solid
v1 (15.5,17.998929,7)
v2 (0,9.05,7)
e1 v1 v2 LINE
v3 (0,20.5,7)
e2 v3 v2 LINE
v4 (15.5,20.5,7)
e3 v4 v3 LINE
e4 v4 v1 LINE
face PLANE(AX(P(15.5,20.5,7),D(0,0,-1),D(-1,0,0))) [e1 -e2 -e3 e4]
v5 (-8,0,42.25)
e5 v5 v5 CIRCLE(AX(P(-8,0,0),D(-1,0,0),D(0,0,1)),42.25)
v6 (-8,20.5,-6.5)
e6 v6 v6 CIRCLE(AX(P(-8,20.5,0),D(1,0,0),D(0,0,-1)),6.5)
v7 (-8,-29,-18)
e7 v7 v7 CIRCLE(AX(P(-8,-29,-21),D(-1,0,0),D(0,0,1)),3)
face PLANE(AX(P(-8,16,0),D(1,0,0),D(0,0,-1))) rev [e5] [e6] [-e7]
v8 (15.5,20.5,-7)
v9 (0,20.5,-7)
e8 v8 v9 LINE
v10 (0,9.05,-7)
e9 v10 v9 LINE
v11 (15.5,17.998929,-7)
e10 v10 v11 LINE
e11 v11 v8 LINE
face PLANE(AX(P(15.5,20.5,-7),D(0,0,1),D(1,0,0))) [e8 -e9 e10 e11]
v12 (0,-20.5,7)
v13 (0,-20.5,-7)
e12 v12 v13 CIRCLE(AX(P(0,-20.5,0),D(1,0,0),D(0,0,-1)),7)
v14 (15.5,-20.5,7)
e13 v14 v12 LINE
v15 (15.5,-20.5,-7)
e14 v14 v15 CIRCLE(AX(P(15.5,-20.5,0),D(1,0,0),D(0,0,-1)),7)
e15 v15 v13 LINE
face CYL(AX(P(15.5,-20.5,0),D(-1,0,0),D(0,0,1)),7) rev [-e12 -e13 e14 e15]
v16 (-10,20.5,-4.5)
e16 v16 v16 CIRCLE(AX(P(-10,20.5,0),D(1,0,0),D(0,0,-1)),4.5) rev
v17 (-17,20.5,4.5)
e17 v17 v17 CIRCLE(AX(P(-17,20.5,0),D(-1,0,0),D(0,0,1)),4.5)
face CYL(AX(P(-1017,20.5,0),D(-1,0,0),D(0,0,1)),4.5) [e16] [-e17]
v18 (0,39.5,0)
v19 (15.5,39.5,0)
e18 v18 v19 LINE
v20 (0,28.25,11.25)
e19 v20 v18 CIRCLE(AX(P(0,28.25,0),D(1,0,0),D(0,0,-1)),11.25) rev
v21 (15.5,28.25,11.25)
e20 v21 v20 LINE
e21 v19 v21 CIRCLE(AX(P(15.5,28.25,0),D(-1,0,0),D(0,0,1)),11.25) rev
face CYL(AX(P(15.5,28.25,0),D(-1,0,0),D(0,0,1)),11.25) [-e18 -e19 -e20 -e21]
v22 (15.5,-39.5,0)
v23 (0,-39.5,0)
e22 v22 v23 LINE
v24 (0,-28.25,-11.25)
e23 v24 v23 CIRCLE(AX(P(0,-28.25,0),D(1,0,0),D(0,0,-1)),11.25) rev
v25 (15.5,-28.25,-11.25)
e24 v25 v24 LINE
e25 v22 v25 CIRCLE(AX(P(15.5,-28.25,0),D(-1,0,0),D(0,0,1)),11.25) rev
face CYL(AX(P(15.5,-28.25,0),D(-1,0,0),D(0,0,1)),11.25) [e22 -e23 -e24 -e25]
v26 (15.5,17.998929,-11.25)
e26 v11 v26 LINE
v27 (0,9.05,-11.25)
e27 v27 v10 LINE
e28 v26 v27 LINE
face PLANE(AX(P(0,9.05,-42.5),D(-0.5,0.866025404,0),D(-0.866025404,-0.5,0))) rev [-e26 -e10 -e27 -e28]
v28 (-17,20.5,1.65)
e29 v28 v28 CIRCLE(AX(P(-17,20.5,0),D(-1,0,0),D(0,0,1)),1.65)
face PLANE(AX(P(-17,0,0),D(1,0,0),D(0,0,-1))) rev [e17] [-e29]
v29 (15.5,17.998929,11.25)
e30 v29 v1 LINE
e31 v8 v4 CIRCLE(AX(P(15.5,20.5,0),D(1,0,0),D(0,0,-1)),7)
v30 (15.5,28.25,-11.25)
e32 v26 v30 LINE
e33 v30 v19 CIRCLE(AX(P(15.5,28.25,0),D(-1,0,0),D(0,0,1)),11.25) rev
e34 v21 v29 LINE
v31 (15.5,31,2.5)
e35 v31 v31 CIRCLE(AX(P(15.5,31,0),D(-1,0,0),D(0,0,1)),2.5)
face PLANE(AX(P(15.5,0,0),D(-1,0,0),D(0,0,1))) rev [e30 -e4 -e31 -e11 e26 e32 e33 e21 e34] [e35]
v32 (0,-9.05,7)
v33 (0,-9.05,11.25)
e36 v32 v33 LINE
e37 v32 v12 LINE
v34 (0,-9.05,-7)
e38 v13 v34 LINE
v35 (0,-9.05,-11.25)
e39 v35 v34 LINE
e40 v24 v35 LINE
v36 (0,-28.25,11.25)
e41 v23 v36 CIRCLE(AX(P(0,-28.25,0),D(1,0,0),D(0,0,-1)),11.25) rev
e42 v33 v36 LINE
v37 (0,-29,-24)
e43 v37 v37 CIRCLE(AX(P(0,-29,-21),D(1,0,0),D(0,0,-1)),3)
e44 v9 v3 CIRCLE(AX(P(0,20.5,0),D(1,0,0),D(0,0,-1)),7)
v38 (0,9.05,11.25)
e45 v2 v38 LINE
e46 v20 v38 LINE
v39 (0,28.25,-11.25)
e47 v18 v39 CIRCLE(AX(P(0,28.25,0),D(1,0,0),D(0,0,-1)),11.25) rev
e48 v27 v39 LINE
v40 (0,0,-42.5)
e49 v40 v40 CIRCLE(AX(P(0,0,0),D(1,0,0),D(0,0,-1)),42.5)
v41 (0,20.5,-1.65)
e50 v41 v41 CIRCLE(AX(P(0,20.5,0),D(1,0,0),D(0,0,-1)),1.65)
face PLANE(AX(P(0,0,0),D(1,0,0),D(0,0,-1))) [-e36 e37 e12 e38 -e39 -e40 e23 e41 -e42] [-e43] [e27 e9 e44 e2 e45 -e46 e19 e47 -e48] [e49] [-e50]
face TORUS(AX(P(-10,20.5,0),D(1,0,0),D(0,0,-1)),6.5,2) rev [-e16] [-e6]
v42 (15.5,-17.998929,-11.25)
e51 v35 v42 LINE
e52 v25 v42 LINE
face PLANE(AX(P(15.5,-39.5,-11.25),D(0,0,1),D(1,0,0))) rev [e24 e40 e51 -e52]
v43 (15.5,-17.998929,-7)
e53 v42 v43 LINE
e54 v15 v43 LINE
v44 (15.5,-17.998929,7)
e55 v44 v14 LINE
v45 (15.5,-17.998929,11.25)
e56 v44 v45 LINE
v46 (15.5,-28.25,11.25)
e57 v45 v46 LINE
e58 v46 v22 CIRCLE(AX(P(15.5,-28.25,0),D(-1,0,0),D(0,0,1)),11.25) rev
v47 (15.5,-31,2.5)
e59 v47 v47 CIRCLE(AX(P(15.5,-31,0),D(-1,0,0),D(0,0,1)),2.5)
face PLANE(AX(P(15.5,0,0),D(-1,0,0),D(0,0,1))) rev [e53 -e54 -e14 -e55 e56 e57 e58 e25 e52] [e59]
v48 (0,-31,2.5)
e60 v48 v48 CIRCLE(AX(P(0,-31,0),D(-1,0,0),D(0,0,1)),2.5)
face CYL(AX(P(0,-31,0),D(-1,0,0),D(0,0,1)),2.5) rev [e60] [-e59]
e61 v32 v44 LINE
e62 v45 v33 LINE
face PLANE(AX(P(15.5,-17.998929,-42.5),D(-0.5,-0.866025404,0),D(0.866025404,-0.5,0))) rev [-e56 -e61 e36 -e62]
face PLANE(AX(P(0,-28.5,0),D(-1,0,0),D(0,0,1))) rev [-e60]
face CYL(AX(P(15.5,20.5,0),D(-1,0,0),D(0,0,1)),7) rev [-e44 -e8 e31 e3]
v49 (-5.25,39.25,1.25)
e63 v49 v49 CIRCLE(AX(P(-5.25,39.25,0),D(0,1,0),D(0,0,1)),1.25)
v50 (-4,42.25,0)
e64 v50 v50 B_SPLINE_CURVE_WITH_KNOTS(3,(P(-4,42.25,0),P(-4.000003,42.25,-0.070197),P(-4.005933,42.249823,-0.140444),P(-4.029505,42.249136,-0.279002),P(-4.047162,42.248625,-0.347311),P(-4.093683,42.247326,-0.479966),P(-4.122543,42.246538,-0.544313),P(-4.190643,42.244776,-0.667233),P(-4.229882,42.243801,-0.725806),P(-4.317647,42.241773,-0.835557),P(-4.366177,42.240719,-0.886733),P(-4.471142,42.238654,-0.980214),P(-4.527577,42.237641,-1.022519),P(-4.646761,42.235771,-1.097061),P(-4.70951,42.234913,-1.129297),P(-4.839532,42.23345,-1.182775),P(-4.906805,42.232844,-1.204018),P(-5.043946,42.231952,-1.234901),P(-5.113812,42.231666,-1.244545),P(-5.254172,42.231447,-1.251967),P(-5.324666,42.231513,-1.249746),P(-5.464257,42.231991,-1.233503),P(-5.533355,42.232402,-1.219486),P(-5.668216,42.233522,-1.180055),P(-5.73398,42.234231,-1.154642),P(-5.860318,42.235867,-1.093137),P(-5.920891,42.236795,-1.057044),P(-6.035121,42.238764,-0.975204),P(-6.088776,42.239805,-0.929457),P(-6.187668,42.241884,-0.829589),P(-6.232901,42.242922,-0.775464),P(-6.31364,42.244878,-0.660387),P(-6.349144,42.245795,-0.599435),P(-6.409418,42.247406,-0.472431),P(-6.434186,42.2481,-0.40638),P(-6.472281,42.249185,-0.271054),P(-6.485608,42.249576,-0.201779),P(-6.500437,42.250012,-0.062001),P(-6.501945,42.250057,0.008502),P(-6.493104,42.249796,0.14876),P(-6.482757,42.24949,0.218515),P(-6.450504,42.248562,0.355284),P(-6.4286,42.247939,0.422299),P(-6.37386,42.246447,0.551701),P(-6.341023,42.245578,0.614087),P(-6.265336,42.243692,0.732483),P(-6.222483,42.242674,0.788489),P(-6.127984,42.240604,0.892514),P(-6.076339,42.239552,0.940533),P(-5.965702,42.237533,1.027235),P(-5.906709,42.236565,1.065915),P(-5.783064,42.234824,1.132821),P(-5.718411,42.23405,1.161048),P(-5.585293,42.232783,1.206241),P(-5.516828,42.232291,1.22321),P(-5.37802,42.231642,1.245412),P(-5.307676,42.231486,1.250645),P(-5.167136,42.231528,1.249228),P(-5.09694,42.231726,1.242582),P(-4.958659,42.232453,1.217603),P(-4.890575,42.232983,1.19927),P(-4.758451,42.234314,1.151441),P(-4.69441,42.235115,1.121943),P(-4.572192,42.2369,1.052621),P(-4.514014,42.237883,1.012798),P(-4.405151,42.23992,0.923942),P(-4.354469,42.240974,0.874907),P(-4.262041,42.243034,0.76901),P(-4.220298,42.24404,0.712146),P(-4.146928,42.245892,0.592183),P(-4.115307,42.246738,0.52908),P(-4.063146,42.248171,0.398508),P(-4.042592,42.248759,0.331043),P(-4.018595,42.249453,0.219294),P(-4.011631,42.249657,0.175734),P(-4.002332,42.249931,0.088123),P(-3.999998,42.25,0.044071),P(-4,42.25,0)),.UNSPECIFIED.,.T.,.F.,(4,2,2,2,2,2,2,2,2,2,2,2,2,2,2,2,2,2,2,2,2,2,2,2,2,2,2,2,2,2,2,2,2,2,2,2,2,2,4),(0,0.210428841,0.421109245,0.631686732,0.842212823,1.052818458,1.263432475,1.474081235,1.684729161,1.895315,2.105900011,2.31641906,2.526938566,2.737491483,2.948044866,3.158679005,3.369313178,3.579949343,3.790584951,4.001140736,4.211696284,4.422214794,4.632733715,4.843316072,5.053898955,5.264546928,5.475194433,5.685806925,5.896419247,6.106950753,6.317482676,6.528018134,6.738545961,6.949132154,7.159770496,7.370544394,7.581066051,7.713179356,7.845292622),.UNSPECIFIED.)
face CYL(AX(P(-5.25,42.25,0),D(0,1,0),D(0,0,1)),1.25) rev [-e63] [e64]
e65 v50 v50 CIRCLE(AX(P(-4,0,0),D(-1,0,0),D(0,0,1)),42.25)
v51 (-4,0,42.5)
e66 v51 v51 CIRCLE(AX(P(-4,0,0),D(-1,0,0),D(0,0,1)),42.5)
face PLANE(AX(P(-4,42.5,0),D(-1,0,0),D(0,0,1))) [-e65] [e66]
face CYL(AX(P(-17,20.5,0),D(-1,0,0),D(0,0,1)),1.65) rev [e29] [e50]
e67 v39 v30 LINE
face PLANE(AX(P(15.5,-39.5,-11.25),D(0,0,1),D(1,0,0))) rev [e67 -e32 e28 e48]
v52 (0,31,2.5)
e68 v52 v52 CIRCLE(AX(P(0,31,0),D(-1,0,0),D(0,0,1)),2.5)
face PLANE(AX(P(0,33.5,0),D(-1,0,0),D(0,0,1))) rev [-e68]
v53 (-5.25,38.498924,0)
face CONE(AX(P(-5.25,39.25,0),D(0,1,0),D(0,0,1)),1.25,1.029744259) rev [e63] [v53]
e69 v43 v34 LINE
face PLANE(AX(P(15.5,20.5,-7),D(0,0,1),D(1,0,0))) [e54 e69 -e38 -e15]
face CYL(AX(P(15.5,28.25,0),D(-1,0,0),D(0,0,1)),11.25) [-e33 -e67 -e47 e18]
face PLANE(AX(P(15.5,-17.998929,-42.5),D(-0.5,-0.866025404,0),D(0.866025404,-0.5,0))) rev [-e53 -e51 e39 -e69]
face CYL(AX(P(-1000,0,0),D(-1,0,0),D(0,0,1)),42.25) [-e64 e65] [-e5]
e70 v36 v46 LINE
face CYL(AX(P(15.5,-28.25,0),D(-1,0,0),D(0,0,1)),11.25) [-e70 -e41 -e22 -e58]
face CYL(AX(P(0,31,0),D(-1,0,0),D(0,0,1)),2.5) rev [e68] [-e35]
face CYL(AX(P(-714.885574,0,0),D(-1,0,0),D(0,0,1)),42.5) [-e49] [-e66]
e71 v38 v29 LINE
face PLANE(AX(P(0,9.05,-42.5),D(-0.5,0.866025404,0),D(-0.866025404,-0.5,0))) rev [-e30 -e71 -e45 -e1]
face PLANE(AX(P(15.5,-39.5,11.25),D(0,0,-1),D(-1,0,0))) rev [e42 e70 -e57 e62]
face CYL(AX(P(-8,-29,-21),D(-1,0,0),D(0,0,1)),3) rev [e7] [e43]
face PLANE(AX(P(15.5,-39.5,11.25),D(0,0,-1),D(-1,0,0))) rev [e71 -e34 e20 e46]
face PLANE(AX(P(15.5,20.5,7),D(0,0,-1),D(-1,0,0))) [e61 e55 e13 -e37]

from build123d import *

# Parameters (mm, degrees)
ESQUISSE1_W                         = 32.5
ESQUISSE1_H                         = 42.5
ESQUISSE2_W                         = 9
ESQUISSE2_H                         = 58.5
CONG_R2_R                           = 2
ESQUISSE3_W                         = 4
ESQUISSE3_H                         = 0.25
D_GROSSISEMENT_OUTLINE_R            = 42.5
D_GROSSISEMENT_OUTLINE_W            = 22.5
D_GROSSISEMENT_OUTLINE_H            = 79
D_GROSSISEMENT_DEPTH                = 15.5
FINITION_EXT_R                      = 11.25
USINAGE_EN_V_DEPTH                  = 63.461988441
USINAGE_EN_V_DEPTH_BACK             = 63.461988441
RAINURE_INT_DEPTH                   = 63.461988441
ESQUISSE10_W                        = 2.5
ESQUISSE10_H                        = 15.5
TROU_TARAUD_M61_AT_2_COUNT          = 2
TROU_TARAUD_M61_AT_2_PITCH          = 62
TROU_TARAUD_M41_D                   = 3.3
DIAM_TRE_DU_PER_AGE_6_0_6_1_D       = 6
DIAM_TRE_DU_PER_AGE_2_5_2_5_1_D     = 2.5
DIAM_TRE_DU_PER_AGE_2_5_2_5_1_DEPTH = 3
DIAM_TRE_DU_PER_AGE_2_5_2_5_1_TIP   = 0.751075774


# Read off the part's stored shape, not the designer's step: Dégrossisement
with BuildPart() as part:
    # Esquisse1 → Brut (revolve)
    with BuildSketch(Plane.XY, mode=Mode.PRIVATE) as brut_sk:
        with Locations((-0.75, 21.25)):
            Rectangle(ESQUISSE1_W, ESQUISSE1_H)
    revolve(brut_sk.sketch.rotate(Axis((-714.885574261, 0, 0), (1, 0, 0)), 90), axis=Axis((-714.885574261, 0, 0), (1, 0, 0)))

    # Esquisse2 → Pion désaxer (revolve, cut)
    with BuildSketch(Plane.XY, mode=Mode.PRIVATE) as pion_d_saxer_sk:
        with Locations((-12.5, -13.25)):
            Rectangle(ESQUISSE2_W, ESQUISSE2_H)
    revolve(pion_d_saxer_sk.sketch.rotate(Axis((-1017, 20.5, 0), (1, 0, 0)), 270), axis=Axis((-1017, 20.5, 0), (1, 0, 0)), mode=Mode.SUBTRACT)

    # Congé R2
    cong_r2_edges = [part.edges().sort_by_distance(p)[0] for p in [
        (-8, 20.5, -4.5),
    ]]
    fillet(cong_r2_edges, radius=CONG_R2_R)

    # Esquisse3 → Enlèv. Ø83d9 (revolve, cut)
    with BuildSketch(Plane.XY, mode=Mode.PRIVATE) as enl_v_83d9_sk:
        with Locations((-6, 42.375)):
            Rectangle(ESQUISSE3_W, ESQUISSE3_H)
    revolve(enl_v_83d9_sk.sketch.rotate(Axis((-1000, 0, 0), (1, 0, 0)), 90), axis=Axis((-1000, 0, 0), (1, 0, 0)), mode=Mode.SUBTRACT)

    # Dégrossisement outline → Dégrossisement (cut)
    with BuildSketch(Plane(origin=(0, 0, 0), x_dir=(0, 0, -1), z_dir=(1, 0, 0))):
        Circle(D_GROSSISEMENT_OUTLINE_R)
        Rectangle(D_GROSSISEMENT_OUTLINE_W, D_GROSSISEMENT_OUTLINE_H, mode=Mode.SUBTRACT)
    extrude(amount=D_GROSSISEMENT_DEPTH, mode=Mode.SUBTRACT)

    # Finition ext.
    finition_ext_edges = [part.edges().sort_by_distance(p)[0] for p in [
        (7.75, -39.5, -11.25),
        (7.75, -39.5, 11.25),
        (7.75, 39.5, -11.25),
        (7.75, 39.5, 11.25),
    ]]
    fillet(finition_ext_edges, radius=FINITION_EXT_R - 0.0001)  # a hair under: the kernel refuses the full size

    # Esquisse5 → Usinage en V (cut, two sides: drawn at the far end of the back side and taken through both)
    with BuildSketch(Plane.XY.offset(-USINAGE_EN_V_DEPTH_BACK)):
        Polygon((0, -9.05), (0, 9.05), (15.5, 17.998929172), (15.5, -17.998929172), align=None)
    extrude(amount=USINAGE_EN_V_DEPTH + USINAGE_EN_V_DEPTH_BACK, mode=Mode.SUBTRACT)

    # Esquisse6 → Rainure Int. (cut, through all)
    with BuildSketch(Plane(origin=(0, 0, 0), x_dir=(0, 0, -1), z_dir=(1, 0, 0))):
        with BuildLine():
            Line((7, 20.5), (7, -20.5))
            ThreePointArc((7, -20.5), (0, -27.5), (-7, -20.5))
            Line((-7, -20.5), (-7, 20.5))
            ThreePointArc((-7, 20.5), (0, 27.5), (7, 20.5))
        make_face()
    extrude(amount=RAINURE_INT_DEPTH, mode=Mode.SUBTRACT)

    # Esquisse10 → Trou taraudé M61 (revolve, cut)
    with BuildSketch(Plane.ZX.offset(31)):
        with Locations((1.25, 7.75)):
            Rectangle(ESQUISSE10_W, ESQUISSE10_H)
    trou_taraud_m61 = revolve(axis=Axis((-6.35, 31, 0), (1, 0, 0)), mode=Mode.SUBTRACT)

    # Trou taraudé M61 at 2: Trou taraudé M61 ×2
    with Locations(*[(0, -i * TROU_TARAUD_M61_AT_2_PITCH, 0) for i in range(1, TROU_TARAUD_M61_AT_2_COUNT)]):
        add(trou_taraud_m61, mode=Mode.SUBTRACT)

    # Trou taraudé M41 (through all)
    with Locations(Plane.ZY.offset(17)):
        with Locations((0, 20.5)):
            Hole(TROU_TARAUD_M41_D / 2)

    # Diamètre du perçage Ø6.0 (6)1 (through all)
    with Locations(Plane.ZY.offset(8)):
        with Locations((-21, -29)):
            Hole(DIAM_TRE_DU_PER_AGE_6_0_6_1_D / 2)

    # Diamètre du perçage Ø2.5 (2.5)1
    with Locations(Plane(origin=(-5.25, 42.25, 0), x_dir=(0, 0, 1), z_dir=(0, 1, 0))):
        with Locations((0, 0)):
            Hole(DIAM_TRE_DU_PER_AGE_2_5_2_5_1_D / 2, depth=DIAM_TRE_DU_PER_AGE_2_5_2_5_1_DEPTH)
            with Locations((0, 0, -(DIAM_TRE_DU_PER_AGE_2_5_2_5_1_DEPTH + DIAM_TRE_DU_PER_AGE_2_5_2_5_1_TIP / 2))):  # 118° drill point
                Cone(0, DIAM_TRE_DU_PER_AGE_2_5_2_5_1_D / 2, DIAM_TRE_DU_PER_AGE_2_5_2_5_1_TIP, mode=Mode.SUBTRACT)


solid = part.part
